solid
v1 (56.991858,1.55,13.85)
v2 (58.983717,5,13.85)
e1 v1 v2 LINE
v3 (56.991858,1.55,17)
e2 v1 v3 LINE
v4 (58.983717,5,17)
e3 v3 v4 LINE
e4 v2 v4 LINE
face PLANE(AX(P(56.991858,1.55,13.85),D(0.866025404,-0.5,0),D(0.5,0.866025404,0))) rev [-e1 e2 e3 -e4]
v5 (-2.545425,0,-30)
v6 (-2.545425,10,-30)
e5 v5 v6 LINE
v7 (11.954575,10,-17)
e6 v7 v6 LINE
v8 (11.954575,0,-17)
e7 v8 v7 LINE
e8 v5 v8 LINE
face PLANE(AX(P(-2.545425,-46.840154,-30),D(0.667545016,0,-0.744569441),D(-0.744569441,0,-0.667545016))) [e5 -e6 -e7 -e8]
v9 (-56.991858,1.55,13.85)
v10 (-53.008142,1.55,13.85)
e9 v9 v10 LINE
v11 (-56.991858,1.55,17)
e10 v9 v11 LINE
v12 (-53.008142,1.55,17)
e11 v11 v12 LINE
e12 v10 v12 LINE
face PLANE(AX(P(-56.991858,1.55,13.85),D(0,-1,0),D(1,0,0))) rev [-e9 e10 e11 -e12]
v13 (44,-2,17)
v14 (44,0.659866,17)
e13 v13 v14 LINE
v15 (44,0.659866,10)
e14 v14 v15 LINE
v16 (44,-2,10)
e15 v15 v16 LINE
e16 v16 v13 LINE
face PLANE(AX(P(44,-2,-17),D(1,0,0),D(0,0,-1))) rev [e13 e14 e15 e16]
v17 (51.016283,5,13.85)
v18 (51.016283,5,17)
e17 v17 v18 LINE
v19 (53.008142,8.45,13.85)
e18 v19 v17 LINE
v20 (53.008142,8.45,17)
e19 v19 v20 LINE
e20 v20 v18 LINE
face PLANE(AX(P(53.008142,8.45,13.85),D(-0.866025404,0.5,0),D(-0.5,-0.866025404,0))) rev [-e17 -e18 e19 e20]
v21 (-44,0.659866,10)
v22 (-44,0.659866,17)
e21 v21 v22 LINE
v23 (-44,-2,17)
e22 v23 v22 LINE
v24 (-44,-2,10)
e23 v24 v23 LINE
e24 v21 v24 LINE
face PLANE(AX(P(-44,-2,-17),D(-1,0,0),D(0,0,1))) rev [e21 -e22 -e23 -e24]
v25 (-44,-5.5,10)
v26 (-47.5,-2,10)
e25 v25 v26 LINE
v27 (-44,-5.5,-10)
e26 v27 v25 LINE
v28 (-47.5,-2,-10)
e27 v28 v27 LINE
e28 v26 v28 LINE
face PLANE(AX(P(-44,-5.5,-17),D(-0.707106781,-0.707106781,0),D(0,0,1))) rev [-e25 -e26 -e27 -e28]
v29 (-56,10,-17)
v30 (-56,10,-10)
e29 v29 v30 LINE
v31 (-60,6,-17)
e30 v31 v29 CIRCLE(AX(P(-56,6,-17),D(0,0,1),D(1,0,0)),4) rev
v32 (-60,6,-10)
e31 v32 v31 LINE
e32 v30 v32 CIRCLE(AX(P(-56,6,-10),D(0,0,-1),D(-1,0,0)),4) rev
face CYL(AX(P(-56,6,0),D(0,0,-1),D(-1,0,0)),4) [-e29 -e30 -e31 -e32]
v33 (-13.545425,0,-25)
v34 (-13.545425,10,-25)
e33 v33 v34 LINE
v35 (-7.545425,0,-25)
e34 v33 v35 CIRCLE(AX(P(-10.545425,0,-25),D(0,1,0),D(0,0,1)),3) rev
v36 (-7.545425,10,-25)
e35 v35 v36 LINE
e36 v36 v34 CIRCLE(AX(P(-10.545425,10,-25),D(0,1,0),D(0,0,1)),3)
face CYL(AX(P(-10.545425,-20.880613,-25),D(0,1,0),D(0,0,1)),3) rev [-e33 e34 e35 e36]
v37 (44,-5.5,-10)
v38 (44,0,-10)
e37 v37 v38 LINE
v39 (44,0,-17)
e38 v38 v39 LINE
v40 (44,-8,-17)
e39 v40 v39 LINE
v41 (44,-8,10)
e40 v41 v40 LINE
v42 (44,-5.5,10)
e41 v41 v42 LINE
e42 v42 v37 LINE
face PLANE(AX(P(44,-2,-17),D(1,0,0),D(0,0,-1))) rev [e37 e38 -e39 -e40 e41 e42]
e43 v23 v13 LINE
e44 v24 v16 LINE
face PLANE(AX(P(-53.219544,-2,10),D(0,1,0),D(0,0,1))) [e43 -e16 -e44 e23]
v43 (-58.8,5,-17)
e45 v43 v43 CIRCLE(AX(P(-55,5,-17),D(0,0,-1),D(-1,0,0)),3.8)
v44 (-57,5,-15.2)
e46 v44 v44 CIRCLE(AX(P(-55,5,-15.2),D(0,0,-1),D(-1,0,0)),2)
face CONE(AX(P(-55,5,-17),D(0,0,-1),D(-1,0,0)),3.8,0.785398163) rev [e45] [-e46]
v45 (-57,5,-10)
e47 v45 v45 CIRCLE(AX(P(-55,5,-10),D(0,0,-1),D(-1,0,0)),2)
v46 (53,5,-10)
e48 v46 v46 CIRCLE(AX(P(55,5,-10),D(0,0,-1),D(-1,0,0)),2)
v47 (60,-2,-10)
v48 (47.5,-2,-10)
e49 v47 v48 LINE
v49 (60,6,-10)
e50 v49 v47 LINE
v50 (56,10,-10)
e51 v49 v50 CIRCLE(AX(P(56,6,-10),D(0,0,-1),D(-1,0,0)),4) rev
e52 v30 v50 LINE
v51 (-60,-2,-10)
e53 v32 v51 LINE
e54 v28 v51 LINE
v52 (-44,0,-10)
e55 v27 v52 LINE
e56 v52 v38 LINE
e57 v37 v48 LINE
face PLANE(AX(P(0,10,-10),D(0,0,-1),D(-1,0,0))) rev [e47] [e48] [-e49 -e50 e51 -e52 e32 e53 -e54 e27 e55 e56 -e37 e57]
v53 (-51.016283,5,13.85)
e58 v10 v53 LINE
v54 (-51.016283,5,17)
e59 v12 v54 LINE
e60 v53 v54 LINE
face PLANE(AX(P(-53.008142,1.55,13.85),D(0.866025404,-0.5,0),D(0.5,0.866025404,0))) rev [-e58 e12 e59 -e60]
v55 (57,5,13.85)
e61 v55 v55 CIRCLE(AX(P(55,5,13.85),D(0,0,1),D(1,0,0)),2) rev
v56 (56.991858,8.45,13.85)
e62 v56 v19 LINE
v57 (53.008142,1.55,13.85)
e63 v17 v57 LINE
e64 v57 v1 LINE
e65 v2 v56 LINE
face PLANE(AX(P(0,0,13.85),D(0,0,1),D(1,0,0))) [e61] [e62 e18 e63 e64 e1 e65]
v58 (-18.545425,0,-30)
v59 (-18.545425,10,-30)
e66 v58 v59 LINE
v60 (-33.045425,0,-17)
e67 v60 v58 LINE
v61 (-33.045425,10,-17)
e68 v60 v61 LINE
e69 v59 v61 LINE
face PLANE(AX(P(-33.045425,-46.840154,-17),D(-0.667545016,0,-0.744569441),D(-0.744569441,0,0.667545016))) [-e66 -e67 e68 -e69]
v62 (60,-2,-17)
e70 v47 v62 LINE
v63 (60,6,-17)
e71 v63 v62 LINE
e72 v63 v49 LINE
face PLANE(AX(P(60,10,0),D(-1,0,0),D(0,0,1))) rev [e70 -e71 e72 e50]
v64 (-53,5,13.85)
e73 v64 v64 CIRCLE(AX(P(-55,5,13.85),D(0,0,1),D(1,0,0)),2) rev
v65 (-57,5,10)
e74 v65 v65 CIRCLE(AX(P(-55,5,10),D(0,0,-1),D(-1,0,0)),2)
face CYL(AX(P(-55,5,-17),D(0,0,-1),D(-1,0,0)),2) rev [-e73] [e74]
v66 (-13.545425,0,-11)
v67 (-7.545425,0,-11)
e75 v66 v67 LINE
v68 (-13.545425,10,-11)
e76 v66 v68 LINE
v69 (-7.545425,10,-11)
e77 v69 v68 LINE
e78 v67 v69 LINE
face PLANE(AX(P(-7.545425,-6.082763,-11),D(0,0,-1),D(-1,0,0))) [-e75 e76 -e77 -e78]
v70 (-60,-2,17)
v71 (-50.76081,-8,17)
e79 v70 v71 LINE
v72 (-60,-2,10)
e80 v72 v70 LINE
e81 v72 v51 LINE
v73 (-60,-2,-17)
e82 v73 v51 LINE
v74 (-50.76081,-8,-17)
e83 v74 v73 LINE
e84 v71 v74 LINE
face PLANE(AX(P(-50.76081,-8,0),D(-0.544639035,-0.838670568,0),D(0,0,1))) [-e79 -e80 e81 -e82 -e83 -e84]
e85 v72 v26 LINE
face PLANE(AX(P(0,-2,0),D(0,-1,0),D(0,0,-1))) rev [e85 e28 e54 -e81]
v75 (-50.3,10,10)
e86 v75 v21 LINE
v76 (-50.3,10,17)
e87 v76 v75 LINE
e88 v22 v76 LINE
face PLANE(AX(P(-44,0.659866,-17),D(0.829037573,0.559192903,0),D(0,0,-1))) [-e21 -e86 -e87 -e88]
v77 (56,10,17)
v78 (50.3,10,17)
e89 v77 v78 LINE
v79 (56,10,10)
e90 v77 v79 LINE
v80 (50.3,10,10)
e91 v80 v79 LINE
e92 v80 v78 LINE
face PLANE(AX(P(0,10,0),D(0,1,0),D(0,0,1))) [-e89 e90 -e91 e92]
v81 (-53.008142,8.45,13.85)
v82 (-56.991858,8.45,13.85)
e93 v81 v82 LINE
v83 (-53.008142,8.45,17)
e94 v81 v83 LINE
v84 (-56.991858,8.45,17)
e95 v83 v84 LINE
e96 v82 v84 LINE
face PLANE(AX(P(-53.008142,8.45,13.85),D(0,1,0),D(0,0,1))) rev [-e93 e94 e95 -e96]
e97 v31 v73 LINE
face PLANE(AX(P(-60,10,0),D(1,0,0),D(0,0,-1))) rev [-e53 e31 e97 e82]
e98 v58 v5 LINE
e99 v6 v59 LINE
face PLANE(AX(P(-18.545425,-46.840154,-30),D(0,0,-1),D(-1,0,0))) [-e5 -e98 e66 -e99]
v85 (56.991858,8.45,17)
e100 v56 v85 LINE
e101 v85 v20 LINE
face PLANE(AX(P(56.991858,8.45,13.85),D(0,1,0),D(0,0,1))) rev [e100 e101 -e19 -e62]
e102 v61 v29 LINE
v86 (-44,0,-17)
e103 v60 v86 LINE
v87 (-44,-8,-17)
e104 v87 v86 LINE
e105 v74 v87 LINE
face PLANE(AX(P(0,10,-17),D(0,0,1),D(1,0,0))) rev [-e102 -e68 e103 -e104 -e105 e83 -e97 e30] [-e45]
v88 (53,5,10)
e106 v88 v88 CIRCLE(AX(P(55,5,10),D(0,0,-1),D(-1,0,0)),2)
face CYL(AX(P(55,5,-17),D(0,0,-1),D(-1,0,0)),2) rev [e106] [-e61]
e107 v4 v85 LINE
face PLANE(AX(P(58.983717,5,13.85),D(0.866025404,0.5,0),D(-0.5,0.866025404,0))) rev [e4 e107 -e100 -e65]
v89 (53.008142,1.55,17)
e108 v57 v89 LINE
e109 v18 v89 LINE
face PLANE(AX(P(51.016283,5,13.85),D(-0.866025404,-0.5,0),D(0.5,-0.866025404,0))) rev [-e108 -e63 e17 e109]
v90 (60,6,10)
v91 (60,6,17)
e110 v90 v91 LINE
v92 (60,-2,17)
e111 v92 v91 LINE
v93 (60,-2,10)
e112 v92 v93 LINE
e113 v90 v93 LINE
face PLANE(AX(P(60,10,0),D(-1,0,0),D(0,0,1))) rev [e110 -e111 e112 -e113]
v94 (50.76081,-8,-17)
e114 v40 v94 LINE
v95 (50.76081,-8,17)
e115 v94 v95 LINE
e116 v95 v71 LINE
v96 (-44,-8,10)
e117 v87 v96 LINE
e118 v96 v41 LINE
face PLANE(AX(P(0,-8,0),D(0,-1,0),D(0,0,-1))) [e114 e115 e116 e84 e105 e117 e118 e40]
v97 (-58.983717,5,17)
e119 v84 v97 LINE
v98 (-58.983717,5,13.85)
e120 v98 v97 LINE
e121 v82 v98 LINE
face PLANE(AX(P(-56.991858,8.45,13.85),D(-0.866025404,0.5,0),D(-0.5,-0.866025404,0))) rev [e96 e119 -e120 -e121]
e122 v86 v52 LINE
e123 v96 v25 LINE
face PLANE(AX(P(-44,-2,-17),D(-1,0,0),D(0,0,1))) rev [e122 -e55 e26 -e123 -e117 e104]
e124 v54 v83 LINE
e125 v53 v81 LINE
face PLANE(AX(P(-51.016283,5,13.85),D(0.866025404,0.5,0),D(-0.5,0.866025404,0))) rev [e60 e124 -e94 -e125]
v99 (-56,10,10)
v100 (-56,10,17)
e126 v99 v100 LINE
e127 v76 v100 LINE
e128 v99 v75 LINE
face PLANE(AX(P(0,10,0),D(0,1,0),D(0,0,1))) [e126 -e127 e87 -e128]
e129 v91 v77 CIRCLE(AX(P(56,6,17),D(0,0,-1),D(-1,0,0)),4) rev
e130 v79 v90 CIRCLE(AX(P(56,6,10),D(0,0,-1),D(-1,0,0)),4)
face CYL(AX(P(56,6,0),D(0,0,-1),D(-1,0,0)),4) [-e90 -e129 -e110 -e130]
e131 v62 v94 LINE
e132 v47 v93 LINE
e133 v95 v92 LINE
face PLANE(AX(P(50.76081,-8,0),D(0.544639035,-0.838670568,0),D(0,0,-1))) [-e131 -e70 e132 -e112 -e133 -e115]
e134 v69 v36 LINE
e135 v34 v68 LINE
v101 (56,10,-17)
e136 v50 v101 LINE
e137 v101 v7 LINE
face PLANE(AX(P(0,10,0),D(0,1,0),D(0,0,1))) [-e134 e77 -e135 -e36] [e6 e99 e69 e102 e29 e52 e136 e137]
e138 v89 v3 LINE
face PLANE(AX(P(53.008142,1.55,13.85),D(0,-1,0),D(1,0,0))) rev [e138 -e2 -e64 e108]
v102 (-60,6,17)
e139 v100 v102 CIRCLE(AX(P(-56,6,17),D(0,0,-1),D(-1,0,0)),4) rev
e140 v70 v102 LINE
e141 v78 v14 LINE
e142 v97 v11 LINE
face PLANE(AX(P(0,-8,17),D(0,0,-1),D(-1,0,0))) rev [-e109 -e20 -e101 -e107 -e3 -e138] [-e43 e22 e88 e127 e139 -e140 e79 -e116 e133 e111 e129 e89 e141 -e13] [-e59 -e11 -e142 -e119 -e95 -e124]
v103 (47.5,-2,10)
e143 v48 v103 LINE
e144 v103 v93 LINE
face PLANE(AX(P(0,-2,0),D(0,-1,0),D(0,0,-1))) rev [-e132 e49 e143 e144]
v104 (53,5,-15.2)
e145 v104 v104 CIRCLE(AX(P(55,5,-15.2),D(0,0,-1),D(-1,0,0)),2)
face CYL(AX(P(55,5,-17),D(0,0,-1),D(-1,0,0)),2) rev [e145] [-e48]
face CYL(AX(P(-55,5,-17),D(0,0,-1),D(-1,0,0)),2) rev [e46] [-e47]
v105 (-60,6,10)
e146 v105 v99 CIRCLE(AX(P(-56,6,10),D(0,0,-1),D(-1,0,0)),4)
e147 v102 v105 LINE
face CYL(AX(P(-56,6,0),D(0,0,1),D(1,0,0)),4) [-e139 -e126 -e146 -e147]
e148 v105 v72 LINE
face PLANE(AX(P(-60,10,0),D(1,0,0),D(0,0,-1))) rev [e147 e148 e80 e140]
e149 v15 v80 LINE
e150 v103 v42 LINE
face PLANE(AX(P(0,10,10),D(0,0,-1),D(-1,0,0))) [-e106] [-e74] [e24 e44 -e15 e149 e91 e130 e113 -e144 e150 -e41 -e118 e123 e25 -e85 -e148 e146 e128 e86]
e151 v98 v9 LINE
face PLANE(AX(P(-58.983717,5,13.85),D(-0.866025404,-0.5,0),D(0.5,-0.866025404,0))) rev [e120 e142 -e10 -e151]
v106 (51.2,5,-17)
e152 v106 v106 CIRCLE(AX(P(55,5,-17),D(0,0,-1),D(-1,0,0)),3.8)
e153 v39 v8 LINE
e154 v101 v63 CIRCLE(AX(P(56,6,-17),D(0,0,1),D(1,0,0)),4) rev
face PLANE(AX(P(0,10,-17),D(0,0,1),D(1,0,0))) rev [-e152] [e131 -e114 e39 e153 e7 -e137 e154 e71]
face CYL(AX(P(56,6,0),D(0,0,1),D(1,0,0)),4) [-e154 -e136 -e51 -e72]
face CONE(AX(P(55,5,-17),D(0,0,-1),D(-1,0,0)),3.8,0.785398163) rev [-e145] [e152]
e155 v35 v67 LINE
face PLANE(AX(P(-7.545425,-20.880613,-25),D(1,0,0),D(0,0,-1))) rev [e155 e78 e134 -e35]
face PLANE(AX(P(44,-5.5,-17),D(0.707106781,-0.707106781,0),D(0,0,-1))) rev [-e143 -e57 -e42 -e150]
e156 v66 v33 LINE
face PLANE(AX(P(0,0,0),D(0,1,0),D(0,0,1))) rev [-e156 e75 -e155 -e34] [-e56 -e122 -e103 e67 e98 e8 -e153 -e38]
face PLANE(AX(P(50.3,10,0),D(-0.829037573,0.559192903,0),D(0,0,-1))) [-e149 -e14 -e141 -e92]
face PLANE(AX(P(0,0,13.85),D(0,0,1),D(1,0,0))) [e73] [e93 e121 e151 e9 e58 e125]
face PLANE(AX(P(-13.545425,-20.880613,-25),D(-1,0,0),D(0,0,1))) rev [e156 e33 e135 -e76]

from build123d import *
from OCP.BRepFilletAPI import BRepFilletAPI_MakeChamfer

# Parameters (mm, degrees)
BOSS_EXTRUDE1_DEPTH                             = 10
FILLET4_R                                       = 4
SKETCH8_W                                       = 16
SKETCH8_H                                       = 7
BOSS_EXTRUDE3_DEPTH                             = 2
SKETCH9_W                                       = 16
SKETCH9_H                                       = 34
BOSS_EXTRUDE4_DEPTH                             = 6
BOSS_EXTRUDE5_DEPTH                             = 10
CUT_EXTRUDE3_DEPTH                              = 10
CHAMFER1_SIZE                                   = 6
CHAMFER1_SIZE_2                                 = 9.239189783
SKETCH13_W                                      = 7
SKETCH13_H                                      = 6
BOSS_EXTRUDE6_DEPTH                             = 88
CHAMFER2_SIZE                                   = 3.5
CSK_FOR_M4_FLAT_HEAD_MACHINE_SCREW1_D           = 4
CSK_FOR_M4_FLAT_HEAD_MACHINE_SCREW1_DEPTH       = 53.798278762
CSK_FOR_M4_FLAT_HEAD_MACHINE_SCREW1_CSINK_D     = 7.6
CSK_FOR_M4_FLAT_HEAD_MACHINE_SCREW1_CSINK_ANGLE = 90
CSK_FOR_M4_FLAT_HEAD_MACHINE_SCREW1_TIP         = 1.201721238
FILLET5_R                                       = 4
SKETCH17_W                                      = 6
SKETCH17_H                                      = 1
BOSS_EXTRUDE7_DEPTH                             = 10
CUT_EXTRUDE4_DEPTH                              = 3.15
CHAMFER3_SIZE                                   = 6.3
CHAMFER3_SIZE2                                  = 9.340134102


# Some blends are built 0.0001 mm under size
with BuildPart() as part:
    # Sketch1 → Boss-Extrude1 (new body)
    with BuildSketch(Plane(origin=(0, 0, 0), x_dir=(1, 0, 0), z_dir=(0, 1, 0))):
        Polygon((0, 17), (-60, 17), (-60, 10), (-43.720595315, 10), (-36.720595315, 10), (-28, 10), (-20, 10), (0, 10), align=None)
        Polygon((60, 17), (0, 17), (0, 10), (20, 10), (28, 10), (36.720595315, 10), (43.720595315, 10), (60, 10), align=None)
        Polygon((60, -10), (51, -10), (44, -10), (44, -17), (60, -17), align=None)
        Polygon((-44, -10), (-51, -10), (-60, -10), (-60, -17), (-44, -17), align=None)
    extrude(amount=BOSS_EXTRUDE1_DEPTH)

    # Fillet4
    fillet4_edges = [part.edges().sort_by_distance(p)[0] for p in [
        (60, 10, -13.5),
        (-60, 10, -13.5),
    ]]
    fillet(fillet4_edges, radius=FILLET4_R)

    # Sketch8 → Boss-Extrude3 (add)
    with BuildSketch(Plane.XZ):
        with Locations((-52, 13.5)):
            Rectangle(SKETCH8_W, SKETCH8_H)
        with Locations((52, 13.5)):
            Rectangle(SKETCH8_W, SKETCH8_H)
        with Locations((52, -13.5)):
            Rectangle(SKETCH8_W, SKETCH8_H)
        with Locations((-52, -13.5)):
            Rectangle(SKETCH8_W, SKETCH8_H)
    extrude(amount=BOSS_EXTRUDE3_DEPTH)

    # Sketch9 → Boss-Extrude4 (add)
    with BuildSketch(Plane.XZ.offset(2)):
        with Locations((-52, 0)):
            Rectangle(SKETCH9_W, SKETCH9_H)
        with Locations((52, 0)):
            Rectangle(SKETCH9_W, SKETCH9_H)
    extrude(amount=BOSS_EXTRUDE4_DEPTH)

    # Sketch10 → Boss-Extrude5 (add)
    with BuildSketch(Plane(origin=(0, 10, 0), x_dir=(1, 0, 0), z_dir=(0, 1, 0))):
        Polygon((-33.045425071, 17), (-18.545425071, 30), (-2.545425071, 30), (11.954574929, 17), align=None)
    extrude(amount=-BOSS_EXTRUDE5_DEPTH)

    # Sketch11 → Cut-Extrude3 (cut)
    with BuildSketch(Plane(origin=(0, 10, 0), x_dir=(1, 0, 0), z_dir=(0, 1, 0))):
        with BuildLine():
            Line((-7.545425071, 25), (-7.545425071, 11))
            ThreePointArc((-7.545425071, 11), (-10.545425071, 8), (-13.545425071, 11))
            Line((-13.545425071, 11), (-13.545425071, 25))
            ThreePointArc((-13.545425071, 25), (-10.545425071, 28), (-7.545425071, 25))
        make_face()
    extrude(amount=-CUT_EXTRUDE3_DEPTH, mode=Mode.SUBTRACT)

    # Chamfer1
    chamfer1_edges_1 = [part.edges().sort_by_distance(p)[0] for p in [
        (-60, -8, 0),
    ]]
    chamfer1_side_1 = [part.faces().sort_by_distance(p)[0] for p in [
        (-60, -7.88, 0),
    ]]
    chamfer1_edges_2 = [part.edges().sort_by_distance(p)[0] for p in [
        (60, -8, 0),
    ]]
    chamfer1_side_2 = [part.faces().sort_by_distance(p)[0] for p in [
        (60, -7.88, 0),
    ]]
    chamfer1 = BRepFilletAPI_MakeChamfer(part.part.solid().wrapped)
    for e in chamfer1_edges_1:
        chamfer1.Add(CHAMFER1_SIZE - 0.0001, CHAMFER1_SIZE_2 - 0.0001, e.wrapped, chamfer1_side_1[0].wrapped)
    for e in chamfer1_edges_2:
        chamfer1.Add(CHAMFER1_SIZE - 0.0001, CHAMFER1_SIZE_2 - 0.0001, e.wrapped, chamfer1_side_2[0].wrapped)
    add(Compound.cast(chamfer1.Shape()), mode=Mode.REPLACE)  # a hair under: the kernel refuses the full size

    # Sketch13 → Boss-Extrude6 (add)
    with BuildSketch(Plane.ZY.offset(-44)):
        with Locations((13.5, -5)):
            Rectangle(SKETCH13_W, SKETCH13_H)
    extrude(amount=BOSS_EXTRUDE6_DEPTH)

    # Chamfer2
    # the kernel refuses this chamfer: 3.5 mm, written as the material it takes off along each edge
    with BuildSketch(Plane(origin=(-44, -2, -10), x_dir=(-0.9996219169112968, 0.027495876610586372, 0), z_dir=(0, 0, 1)), Plane(origin=(44, -2, 10), x_dir=(0.9996219169112968, 0.027495876610586188, 0), z_dir=(0, 0, -1))) as chamfer2_piece_1:
        Polygon((CHAMFER2_SIZE * 0.999621916911, CHAMFER2_SIZE * 0.0274958766106), (-CHAMFER2_SIZE * 0.0274958766106, CHAMFER2_SIZE * 0.999621916911), (0, 0), align=None)
    extrude(amount=20, mode=Mode.SUBTRACT)

    # CSK for M4 Flat Head Machine Screw1
    with Locations(Plane(origin=(0, 0, -17), x_dir=(-1, 0, 0), z_dir=(0, 0, -1))):
        with Locations((-55, 5), (55, 5)):
            CounterSinkHole(CSK_FOR_M4_FLAT_HEAD_MACHINE_SCREW1_D / 2, CSK_FOR_M4_FLAT_HEAD_MACHINE_SCREW1_CSINK_D / 2, depth=CSK_FOR_M4_FLAT_HEAD_MACHINE_SCREW1_DEPTH, counter_sink_angle=CSK_FOR_M4_FLAT_HEAD_MACHINE_SCREW1_CSINK_ANGLE)
            with Locations((0, 0, -(CSK_FOR_M4_FLAT_HEAD_MACHINE_SCREW1_DEPTH + CSK_FOR_M4_FLAT_HEAD_MACHINE_SCREW1_TIP / 2))):  # 118° drill point
                Cone(0, CSK_FOR_M4_FLAT_HEAD_MACHINE_SCREW1_D / 2, CSK_FOR_M4_FLAT_HEAD_MACHINE_SCREW1_TIP, mode=Mode.SUBTRACT)

    # Fillet5
    fillet5_edges = [part.edges().sort_by_distance(p)[0] for p in [
        (-60, 10, 13.5),
        (60, 10, 13.5),
    ]]
    fillet(fillet5_edges, radius=FILLET5_R)

    # Sketch17 → Boss-Extrude7 (add)
    with BuildSketch(Plane(origin=(0, 10, 0), x_dir=(1, 0, 0), z_dir=(0, 1, 0))):
        with Locations((-10.545425071, 10.5)):
            Rectangle(SKETCH17_W, SKETCH17_H)
    extrude(amount=-BOSS_EXTRUDE7_DEPTH)

    # Sketch18 → Cut-Extrude4 (cut)
    with BuildSketch(Plane.XY.offset(17)):
        Polygon((51.016283143, 5), (53.008141571, 1.55), (56.991858429, 1.55), (58.983716857, 5), (56.991858429, 8.45), (53.008141571, 8.45), align=None)
        Polygon((-51.016283143, 5), (-53.008141571, 8.45), (-56.991858429, 8.45), (-58.983716857, 5), (-56.991858429, 1.55), (-53.008141571, 1.55), align=None)
    extrude(amount=-CUT_EXTRUDE4_DEPTH, mode=Mode.SUBTRACT)

    # Chamfer3: one chamfer whose edges measure the first distance from different faces: ONE call of the kernel's chamfer builder (chamfer() names one face for all edges)
    chamfer3_edges_1 = [part.edges().sort_by_distance(p)[0] for p in [
        (-44, 10, 13.5),
    ]]
    chamfer3_side_1 = [part.faces().sort_by_distance(p)[0] for p in [
        (-50, 10, 13.5),
    ]]
    chamfer3_edges_2 = [part.edges().sort_by_distance(p)[0] for p in [
        (44, 10, 13.5),
    ]]
    chamfer3_side_2 = [part.faces().sort_by_distance(p)[0] for p in [
        (50, 10, 13.5),
    ]]
    chamfer3 = BRepFilletAPI_MakeChamfer(part.part.solid().wrapped)
    for e in chamfer3_edges_1:
        chamfer3.Add(CHAMFER3_SIZE, CHAMFER3_SIZE2, e.wrapped, chamfer3_side_1[0].wrapped)  # the first distance lies on this face
    for e in chamfer3_edges_2:
        chamfer3.Add(CHAMFER3_SIZE, CHAMFER3_SIZE2, e.wrapped, chamfer3_side_2[0].wrapped)  # the first distance lies on this face
    add(Compound.cast(chamfer3.Shape()), mode=Mode.REPLACE)


solid = part.part
